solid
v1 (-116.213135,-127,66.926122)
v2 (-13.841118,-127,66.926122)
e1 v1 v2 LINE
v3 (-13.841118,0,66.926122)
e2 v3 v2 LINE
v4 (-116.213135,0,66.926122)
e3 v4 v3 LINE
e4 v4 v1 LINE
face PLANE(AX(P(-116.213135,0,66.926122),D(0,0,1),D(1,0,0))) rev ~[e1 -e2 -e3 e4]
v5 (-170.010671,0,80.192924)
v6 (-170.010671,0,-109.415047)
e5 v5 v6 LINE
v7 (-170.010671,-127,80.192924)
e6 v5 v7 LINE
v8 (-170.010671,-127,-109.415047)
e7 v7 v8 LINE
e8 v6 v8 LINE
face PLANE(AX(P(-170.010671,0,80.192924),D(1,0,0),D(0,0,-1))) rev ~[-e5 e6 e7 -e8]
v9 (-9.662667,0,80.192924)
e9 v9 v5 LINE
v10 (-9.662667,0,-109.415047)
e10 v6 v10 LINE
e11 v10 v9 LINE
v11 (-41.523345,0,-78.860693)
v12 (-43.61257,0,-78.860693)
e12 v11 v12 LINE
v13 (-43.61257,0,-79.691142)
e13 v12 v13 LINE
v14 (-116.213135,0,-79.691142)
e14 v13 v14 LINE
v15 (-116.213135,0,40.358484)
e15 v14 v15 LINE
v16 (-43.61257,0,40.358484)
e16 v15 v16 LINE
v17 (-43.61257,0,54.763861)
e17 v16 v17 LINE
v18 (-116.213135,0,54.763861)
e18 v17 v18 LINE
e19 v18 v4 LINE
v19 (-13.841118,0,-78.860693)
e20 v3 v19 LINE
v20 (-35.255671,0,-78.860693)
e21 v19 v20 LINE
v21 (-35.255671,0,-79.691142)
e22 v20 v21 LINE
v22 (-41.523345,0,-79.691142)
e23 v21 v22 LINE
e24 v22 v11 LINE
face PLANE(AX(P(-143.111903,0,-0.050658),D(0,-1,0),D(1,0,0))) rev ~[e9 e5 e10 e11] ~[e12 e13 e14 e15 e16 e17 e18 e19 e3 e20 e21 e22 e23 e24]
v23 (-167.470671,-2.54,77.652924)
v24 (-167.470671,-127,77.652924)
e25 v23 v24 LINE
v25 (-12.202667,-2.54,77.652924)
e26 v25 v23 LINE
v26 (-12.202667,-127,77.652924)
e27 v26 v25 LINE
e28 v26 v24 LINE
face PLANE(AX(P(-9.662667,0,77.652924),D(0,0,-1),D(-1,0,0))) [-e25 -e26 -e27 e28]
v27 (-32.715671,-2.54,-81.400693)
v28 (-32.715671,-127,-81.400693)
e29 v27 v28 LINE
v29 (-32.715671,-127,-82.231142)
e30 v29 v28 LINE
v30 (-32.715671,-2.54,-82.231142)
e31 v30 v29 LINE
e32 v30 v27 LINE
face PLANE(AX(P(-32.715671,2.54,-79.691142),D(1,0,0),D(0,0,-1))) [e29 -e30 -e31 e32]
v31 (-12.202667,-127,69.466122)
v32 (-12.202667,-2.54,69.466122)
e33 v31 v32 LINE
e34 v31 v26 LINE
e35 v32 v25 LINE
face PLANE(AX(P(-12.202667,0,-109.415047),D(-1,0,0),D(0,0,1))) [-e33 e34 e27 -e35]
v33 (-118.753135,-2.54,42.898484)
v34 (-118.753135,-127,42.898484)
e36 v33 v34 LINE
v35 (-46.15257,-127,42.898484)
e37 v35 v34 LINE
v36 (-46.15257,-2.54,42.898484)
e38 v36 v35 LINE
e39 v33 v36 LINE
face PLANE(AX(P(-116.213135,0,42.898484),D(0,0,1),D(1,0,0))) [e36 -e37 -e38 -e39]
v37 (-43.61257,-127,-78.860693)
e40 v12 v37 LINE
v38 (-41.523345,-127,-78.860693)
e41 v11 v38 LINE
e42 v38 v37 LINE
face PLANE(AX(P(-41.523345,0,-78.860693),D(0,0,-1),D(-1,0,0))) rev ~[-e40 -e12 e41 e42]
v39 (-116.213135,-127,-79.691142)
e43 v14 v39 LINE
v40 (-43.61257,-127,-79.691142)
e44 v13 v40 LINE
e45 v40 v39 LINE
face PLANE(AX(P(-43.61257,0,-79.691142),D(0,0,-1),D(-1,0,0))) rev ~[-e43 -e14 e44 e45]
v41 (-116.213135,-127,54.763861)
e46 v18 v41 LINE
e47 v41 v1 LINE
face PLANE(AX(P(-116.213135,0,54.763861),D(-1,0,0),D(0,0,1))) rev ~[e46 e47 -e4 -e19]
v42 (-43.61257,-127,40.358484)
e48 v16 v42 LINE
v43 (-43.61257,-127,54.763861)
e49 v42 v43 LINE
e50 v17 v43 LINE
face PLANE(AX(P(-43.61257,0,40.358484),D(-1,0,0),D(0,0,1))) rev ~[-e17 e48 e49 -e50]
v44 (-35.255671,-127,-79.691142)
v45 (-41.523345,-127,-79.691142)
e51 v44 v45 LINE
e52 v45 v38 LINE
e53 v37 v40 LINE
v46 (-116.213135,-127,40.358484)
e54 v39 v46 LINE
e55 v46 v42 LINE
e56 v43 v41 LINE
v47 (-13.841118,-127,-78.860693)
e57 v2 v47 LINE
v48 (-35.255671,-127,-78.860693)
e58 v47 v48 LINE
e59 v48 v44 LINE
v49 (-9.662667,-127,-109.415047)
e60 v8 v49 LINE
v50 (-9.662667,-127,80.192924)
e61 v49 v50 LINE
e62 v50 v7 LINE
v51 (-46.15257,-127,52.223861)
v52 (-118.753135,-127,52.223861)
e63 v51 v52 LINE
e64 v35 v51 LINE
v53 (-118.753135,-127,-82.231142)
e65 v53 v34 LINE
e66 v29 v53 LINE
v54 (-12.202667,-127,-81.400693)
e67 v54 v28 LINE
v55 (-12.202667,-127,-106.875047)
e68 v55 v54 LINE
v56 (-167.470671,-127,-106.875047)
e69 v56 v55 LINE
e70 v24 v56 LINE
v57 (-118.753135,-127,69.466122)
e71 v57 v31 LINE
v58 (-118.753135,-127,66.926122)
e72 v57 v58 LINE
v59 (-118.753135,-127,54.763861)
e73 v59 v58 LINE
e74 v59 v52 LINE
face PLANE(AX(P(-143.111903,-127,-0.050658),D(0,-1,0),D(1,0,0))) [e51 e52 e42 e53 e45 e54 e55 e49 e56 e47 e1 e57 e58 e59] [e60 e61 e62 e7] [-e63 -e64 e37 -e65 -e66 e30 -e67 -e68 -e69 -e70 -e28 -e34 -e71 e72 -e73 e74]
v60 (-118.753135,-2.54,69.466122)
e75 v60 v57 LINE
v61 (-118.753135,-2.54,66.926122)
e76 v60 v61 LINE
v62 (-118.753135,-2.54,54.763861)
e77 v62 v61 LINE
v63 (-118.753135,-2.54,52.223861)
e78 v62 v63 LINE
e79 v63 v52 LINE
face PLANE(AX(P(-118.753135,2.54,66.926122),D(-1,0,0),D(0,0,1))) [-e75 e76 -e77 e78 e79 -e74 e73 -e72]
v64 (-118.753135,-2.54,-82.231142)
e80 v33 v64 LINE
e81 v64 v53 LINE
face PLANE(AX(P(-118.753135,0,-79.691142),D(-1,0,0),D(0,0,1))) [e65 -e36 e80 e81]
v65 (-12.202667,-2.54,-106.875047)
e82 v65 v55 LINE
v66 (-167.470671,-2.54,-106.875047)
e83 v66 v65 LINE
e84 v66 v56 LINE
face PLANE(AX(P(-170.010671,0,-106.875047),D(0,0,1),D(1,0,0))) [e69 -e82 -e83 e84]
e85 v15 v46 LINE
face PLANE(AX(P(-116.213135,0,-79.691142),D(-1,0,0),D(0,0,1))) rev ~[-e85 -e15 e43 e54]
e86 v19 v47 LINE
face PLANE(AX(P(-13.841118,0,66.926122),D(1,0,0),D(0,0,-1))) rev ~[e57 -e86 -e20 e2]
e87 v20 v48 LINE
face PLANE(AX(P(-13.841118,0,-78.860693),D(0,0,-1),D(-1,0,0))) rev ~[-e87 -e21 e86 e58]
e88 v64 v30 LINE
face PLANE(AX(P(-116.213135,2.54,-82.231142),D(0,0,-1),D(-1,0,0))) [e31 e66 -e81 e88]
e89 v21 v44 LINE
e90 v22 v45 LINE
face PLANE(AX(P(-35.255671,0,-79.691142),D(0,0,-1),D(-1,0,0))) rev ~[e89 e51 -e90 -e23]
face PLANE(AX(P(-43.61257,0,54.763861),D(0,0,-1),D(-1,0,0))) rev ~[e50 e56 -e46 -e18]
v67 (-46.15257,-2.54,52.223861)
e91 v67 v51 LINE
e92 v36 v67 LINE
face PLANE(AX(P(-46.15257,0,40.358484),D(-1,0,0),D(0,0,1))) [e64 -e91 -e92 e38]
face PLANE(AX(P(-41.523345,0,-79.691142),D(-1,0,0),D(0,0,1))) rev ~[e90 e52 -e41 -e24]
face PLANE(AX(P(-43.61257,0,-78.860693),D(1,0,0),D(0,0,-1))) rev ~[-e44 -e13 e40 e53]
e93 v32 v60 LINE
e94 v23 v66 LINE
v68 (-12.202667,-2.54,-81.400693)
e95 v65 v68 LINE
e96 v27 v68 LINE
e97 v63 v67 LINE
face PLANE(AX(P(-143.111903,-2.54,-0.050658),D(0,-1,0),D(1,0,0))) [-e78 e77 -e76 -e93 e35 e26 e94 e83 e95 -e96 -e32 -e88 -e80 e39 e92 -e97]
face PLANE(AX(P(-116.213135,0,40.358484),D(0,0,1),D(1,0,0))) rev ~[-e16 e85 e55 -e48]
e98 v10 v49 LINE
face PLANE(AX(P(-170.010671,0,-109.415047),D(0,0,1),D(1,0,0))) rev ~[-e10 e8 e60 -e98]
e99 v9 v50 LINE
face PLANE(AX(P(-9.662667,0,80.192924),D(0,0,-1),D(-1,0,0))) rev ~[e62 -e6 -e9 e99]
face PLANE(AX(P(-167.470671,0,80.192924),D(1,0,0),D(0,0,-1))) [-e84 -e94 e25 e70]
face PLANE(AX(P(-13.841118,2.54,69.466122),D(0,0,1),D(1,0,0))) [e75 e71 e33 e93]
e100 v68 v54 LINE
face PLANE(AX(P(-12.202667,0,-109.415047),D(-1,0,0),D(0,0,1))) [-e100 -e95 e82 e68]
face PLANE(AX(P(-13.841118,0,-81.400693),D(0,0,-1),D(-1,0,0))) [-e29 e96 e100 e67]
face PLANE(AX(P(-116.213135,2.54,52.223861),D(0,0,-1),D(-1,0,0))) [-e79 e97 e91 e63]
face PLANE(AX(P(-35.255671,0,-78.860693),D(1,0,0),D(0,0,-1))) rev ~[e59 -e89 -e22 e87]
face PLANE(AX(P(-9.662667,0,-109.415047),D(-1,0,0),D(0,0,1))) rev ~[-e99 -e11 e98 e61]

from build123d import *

# Parameters (mm, degrees)
F0_W        = 53.7975355983
F0_H        = 80.8182843029
F0_H_2      = 16.7721658945
F0_H_3      = 21.6287262738
F0_H_4      = 0.8304491639
F0_H_5      = 12.1622607112
F1_DEPTH    = 127
F2_T        = 2.54
F2_T3_DEPTH = 132.08


# Not quite as in the source:
# - a shell that OpenCascade refuses in one call is made with other operations: the cavity is built on its own and cut out


with BuildPart() as f1:
    # F0 (on Front) → F1 (new body)
    with BuildSketch(Plane.XZ):
        with Locations((-143.1119032204, -0.0506583601)):
            Rectangle(F0_W, F0_H)
        with Locations((-143.1119032204, -48.8458834589)):
            Rectangle(F0_W, F0_H_2)
        with Locations((-143.1119032204, -68.046329543)):
            Rectangle(F0_W, F0_H_3)
        Polygon((-170.0106710196, 54.7638610005), (-170.0106710196, 40.3584837914), (-116.2131354213, 40.3584837914), (-74.950940907, 40.3584837914), (-43.6125695705, 40.3584837914), (-43.6125695705, 54.7638610005), (-116.2131354213, 54.7638610005), align=None)
        with Locations((-143.1119032204, -79.2759172618)):
            Rectangle(F0_W, F0_H_4)
        with Locations((-143.1119032204, 60.8449913561)):
            Rectangle(F0_W, F0_H_5)
        Polygon((-116.2131354213, -79.6911418438), (-170.0106710196, -79.6911418438), (-170.0106710196, -109.4150468707), (-9.6626672894, -109.4150468707), (-9.6626672894, -78.8606926799), (-13.8411177322, -78.8606926799), (-35.2556705475, -78.8606926799), (-35.2556705475, -79.6911418438), (-41.5233448148, -79.6911418438), (-41.5233448148, -78.8606926799), (-43.6125695705, -78.8606926799), (-43.6125695705, -79.6911418438), (-74.950940907, -79.6911418438), align=None)
        Polygon((-170.0106710196, 80.1929235458), (-170.0106710196, 66.9261217117), (-116.2131354213, 66.9261217117), (-43.6125695705, 66.9261217117), (-13.8411177322, 66.9261217117), (-9.6626672894, 66.9261217117), (-9.6626672894, 80.1929235458), align=None)
        Polygon((-13.8411177322, 54.7638610005), (-13.8411177322, 40.3584837914), (-13.8411177322, 6.9799921475), (-13.8411177322, -32.6986536384), (-13.8411177322, -78.8606926799), (-9.6626672894, -78.8606926799), (-9.6626672894, 66.9261217117), (-13.8411177322, 66.9261217117), align=None)
    extrude(amount=F1_DEPTH)

    # F2: shell of thickness 2.54, made by hand


with BuildPart() as f2_core1:
    # F2_t2: copy of F1
    add(f1.part)

    # the walls: a layer under each face that stays
    f2_faces = [f2_core1.faces().sort_by_distance(p)[0] for p in [
        (-79.9128524959, -63.5, 40.3584837914),
        (-43.6125695705, -63.5, 47.5611723959),
        (-79.9128524959, -63.5, 54.7638610005),
        (-116.2131354213, -63.5, 60.8449913561),
        (-65.0271265768, -63.5, 66.9261217117),
        (-13.8411177322, -63.5, -5.9672854841),
        (-24.5483941399, -63.5, -78.8606926799),
        (-35.2556705475, -63.5, -79.2759172618),
        (-38.3895076811, -63.5, -79.6911418438),
        (-41.5233448148, -63.5, -79.2759172618),
        (-42.5679571927, -63.5, -78.8606926799),
        (-43.6125695705, -63.5, -79.2759172618),
        (-79.9128524959, -63.5, -79.6911418438),
        (-116.2131354213, -63.5, -19.6663290262),
        (-89.8366691545, -63.5, 80.1929235458),
        (-170.0106710196, -63.5, -14.6110616624),
        (-89.8366691545, -63.5, -109.4150468707),
        (-9.6626672894, -63.5, -14.6110616624),
        (-143.2860037312, 0, -77.813718468),
    ]]
    thicken(f2_faces, amount=-F2_T, mode=Mode.SUBTRACT)

    # F2_s4 → F2_t3 (cut)
    with BuildSketch(Plane.XZ.offset(-2.54)):
        Polygon((-116.1877354213, 40.3330837914), (-116.2131354213, 42.8984837914), (-118.7531354213, 42.8984837914), (-118.7531354213, 40.3584837914), align=None)
        Polygon((-116.1877354213, 54.7892610005), (-116.2131354213, 52.2238610005), (-118.7531354213, 52.2238610005), (-118.7531354213, 54.7638610005), align=None)
        Polygon((-116.1877354213, 66.9007217117), (-118.7531354213, 66.9261217117), (-118.7531354213, 69.4661217117), (-116.2131354213, 69.4661217117), align=None)
        Polygon((-13.8665177322, 66.9007217117), (-13.8411177322, 69.4661217117), (-11.3011177322, 69.4661217117), (-11.3011177322, 66.9261217117), align=None)
        Polygon((-13.8665177322, -78.8352926799), (-11.3011177322, -78.8606926799), (-11.3011177322, -81.4006926799), (-13.8411177322, -81.4006926799), align=None)
        Polygon((-35.2810705475, -79.6657418438), (-32.7156705475, -79.6911418438), (-32.7156705475, -82.2311418438), (-35.2556705475, -82.2311418438), align=None)
        Polygon((-41.4979448148, -79.6657418438), (-41.5233448148, -82.2311418438), (-44.0633448148, -82.2311418438), (-44.0633448148, -79.6911418438), align=None)
        Polygon((-43.6379695705, -79.6657418438), (-41.0725695705, -79.6911418438), (-41.0725695705, -82.2311418438), (-43.6125695705, -82.2311418438), align=None)
        Polygon((-116.1877354213, -79.6657418438), (-116.2131354213, -82.2311418438), (-118.7531354213, -82.2311418438), (-118.7531354213, -79.6911418438), align=None)
    extrude(amount=F2_T3_DEPTH, mode=Mode.SUBTRACT)


with BuildPart() as f1_1:
    add(f1.part)

    # what is left inside the walls is the cavity
    f2_cavity = [f2_core1.part.solids().sort_by_distance(p)[0] for p in [
        (-167.445271, -85.513333, -14.611062),
    ]]
    add(f2_cavity, mode=Mode.SUBTRACT)


solid = f1_1.part
